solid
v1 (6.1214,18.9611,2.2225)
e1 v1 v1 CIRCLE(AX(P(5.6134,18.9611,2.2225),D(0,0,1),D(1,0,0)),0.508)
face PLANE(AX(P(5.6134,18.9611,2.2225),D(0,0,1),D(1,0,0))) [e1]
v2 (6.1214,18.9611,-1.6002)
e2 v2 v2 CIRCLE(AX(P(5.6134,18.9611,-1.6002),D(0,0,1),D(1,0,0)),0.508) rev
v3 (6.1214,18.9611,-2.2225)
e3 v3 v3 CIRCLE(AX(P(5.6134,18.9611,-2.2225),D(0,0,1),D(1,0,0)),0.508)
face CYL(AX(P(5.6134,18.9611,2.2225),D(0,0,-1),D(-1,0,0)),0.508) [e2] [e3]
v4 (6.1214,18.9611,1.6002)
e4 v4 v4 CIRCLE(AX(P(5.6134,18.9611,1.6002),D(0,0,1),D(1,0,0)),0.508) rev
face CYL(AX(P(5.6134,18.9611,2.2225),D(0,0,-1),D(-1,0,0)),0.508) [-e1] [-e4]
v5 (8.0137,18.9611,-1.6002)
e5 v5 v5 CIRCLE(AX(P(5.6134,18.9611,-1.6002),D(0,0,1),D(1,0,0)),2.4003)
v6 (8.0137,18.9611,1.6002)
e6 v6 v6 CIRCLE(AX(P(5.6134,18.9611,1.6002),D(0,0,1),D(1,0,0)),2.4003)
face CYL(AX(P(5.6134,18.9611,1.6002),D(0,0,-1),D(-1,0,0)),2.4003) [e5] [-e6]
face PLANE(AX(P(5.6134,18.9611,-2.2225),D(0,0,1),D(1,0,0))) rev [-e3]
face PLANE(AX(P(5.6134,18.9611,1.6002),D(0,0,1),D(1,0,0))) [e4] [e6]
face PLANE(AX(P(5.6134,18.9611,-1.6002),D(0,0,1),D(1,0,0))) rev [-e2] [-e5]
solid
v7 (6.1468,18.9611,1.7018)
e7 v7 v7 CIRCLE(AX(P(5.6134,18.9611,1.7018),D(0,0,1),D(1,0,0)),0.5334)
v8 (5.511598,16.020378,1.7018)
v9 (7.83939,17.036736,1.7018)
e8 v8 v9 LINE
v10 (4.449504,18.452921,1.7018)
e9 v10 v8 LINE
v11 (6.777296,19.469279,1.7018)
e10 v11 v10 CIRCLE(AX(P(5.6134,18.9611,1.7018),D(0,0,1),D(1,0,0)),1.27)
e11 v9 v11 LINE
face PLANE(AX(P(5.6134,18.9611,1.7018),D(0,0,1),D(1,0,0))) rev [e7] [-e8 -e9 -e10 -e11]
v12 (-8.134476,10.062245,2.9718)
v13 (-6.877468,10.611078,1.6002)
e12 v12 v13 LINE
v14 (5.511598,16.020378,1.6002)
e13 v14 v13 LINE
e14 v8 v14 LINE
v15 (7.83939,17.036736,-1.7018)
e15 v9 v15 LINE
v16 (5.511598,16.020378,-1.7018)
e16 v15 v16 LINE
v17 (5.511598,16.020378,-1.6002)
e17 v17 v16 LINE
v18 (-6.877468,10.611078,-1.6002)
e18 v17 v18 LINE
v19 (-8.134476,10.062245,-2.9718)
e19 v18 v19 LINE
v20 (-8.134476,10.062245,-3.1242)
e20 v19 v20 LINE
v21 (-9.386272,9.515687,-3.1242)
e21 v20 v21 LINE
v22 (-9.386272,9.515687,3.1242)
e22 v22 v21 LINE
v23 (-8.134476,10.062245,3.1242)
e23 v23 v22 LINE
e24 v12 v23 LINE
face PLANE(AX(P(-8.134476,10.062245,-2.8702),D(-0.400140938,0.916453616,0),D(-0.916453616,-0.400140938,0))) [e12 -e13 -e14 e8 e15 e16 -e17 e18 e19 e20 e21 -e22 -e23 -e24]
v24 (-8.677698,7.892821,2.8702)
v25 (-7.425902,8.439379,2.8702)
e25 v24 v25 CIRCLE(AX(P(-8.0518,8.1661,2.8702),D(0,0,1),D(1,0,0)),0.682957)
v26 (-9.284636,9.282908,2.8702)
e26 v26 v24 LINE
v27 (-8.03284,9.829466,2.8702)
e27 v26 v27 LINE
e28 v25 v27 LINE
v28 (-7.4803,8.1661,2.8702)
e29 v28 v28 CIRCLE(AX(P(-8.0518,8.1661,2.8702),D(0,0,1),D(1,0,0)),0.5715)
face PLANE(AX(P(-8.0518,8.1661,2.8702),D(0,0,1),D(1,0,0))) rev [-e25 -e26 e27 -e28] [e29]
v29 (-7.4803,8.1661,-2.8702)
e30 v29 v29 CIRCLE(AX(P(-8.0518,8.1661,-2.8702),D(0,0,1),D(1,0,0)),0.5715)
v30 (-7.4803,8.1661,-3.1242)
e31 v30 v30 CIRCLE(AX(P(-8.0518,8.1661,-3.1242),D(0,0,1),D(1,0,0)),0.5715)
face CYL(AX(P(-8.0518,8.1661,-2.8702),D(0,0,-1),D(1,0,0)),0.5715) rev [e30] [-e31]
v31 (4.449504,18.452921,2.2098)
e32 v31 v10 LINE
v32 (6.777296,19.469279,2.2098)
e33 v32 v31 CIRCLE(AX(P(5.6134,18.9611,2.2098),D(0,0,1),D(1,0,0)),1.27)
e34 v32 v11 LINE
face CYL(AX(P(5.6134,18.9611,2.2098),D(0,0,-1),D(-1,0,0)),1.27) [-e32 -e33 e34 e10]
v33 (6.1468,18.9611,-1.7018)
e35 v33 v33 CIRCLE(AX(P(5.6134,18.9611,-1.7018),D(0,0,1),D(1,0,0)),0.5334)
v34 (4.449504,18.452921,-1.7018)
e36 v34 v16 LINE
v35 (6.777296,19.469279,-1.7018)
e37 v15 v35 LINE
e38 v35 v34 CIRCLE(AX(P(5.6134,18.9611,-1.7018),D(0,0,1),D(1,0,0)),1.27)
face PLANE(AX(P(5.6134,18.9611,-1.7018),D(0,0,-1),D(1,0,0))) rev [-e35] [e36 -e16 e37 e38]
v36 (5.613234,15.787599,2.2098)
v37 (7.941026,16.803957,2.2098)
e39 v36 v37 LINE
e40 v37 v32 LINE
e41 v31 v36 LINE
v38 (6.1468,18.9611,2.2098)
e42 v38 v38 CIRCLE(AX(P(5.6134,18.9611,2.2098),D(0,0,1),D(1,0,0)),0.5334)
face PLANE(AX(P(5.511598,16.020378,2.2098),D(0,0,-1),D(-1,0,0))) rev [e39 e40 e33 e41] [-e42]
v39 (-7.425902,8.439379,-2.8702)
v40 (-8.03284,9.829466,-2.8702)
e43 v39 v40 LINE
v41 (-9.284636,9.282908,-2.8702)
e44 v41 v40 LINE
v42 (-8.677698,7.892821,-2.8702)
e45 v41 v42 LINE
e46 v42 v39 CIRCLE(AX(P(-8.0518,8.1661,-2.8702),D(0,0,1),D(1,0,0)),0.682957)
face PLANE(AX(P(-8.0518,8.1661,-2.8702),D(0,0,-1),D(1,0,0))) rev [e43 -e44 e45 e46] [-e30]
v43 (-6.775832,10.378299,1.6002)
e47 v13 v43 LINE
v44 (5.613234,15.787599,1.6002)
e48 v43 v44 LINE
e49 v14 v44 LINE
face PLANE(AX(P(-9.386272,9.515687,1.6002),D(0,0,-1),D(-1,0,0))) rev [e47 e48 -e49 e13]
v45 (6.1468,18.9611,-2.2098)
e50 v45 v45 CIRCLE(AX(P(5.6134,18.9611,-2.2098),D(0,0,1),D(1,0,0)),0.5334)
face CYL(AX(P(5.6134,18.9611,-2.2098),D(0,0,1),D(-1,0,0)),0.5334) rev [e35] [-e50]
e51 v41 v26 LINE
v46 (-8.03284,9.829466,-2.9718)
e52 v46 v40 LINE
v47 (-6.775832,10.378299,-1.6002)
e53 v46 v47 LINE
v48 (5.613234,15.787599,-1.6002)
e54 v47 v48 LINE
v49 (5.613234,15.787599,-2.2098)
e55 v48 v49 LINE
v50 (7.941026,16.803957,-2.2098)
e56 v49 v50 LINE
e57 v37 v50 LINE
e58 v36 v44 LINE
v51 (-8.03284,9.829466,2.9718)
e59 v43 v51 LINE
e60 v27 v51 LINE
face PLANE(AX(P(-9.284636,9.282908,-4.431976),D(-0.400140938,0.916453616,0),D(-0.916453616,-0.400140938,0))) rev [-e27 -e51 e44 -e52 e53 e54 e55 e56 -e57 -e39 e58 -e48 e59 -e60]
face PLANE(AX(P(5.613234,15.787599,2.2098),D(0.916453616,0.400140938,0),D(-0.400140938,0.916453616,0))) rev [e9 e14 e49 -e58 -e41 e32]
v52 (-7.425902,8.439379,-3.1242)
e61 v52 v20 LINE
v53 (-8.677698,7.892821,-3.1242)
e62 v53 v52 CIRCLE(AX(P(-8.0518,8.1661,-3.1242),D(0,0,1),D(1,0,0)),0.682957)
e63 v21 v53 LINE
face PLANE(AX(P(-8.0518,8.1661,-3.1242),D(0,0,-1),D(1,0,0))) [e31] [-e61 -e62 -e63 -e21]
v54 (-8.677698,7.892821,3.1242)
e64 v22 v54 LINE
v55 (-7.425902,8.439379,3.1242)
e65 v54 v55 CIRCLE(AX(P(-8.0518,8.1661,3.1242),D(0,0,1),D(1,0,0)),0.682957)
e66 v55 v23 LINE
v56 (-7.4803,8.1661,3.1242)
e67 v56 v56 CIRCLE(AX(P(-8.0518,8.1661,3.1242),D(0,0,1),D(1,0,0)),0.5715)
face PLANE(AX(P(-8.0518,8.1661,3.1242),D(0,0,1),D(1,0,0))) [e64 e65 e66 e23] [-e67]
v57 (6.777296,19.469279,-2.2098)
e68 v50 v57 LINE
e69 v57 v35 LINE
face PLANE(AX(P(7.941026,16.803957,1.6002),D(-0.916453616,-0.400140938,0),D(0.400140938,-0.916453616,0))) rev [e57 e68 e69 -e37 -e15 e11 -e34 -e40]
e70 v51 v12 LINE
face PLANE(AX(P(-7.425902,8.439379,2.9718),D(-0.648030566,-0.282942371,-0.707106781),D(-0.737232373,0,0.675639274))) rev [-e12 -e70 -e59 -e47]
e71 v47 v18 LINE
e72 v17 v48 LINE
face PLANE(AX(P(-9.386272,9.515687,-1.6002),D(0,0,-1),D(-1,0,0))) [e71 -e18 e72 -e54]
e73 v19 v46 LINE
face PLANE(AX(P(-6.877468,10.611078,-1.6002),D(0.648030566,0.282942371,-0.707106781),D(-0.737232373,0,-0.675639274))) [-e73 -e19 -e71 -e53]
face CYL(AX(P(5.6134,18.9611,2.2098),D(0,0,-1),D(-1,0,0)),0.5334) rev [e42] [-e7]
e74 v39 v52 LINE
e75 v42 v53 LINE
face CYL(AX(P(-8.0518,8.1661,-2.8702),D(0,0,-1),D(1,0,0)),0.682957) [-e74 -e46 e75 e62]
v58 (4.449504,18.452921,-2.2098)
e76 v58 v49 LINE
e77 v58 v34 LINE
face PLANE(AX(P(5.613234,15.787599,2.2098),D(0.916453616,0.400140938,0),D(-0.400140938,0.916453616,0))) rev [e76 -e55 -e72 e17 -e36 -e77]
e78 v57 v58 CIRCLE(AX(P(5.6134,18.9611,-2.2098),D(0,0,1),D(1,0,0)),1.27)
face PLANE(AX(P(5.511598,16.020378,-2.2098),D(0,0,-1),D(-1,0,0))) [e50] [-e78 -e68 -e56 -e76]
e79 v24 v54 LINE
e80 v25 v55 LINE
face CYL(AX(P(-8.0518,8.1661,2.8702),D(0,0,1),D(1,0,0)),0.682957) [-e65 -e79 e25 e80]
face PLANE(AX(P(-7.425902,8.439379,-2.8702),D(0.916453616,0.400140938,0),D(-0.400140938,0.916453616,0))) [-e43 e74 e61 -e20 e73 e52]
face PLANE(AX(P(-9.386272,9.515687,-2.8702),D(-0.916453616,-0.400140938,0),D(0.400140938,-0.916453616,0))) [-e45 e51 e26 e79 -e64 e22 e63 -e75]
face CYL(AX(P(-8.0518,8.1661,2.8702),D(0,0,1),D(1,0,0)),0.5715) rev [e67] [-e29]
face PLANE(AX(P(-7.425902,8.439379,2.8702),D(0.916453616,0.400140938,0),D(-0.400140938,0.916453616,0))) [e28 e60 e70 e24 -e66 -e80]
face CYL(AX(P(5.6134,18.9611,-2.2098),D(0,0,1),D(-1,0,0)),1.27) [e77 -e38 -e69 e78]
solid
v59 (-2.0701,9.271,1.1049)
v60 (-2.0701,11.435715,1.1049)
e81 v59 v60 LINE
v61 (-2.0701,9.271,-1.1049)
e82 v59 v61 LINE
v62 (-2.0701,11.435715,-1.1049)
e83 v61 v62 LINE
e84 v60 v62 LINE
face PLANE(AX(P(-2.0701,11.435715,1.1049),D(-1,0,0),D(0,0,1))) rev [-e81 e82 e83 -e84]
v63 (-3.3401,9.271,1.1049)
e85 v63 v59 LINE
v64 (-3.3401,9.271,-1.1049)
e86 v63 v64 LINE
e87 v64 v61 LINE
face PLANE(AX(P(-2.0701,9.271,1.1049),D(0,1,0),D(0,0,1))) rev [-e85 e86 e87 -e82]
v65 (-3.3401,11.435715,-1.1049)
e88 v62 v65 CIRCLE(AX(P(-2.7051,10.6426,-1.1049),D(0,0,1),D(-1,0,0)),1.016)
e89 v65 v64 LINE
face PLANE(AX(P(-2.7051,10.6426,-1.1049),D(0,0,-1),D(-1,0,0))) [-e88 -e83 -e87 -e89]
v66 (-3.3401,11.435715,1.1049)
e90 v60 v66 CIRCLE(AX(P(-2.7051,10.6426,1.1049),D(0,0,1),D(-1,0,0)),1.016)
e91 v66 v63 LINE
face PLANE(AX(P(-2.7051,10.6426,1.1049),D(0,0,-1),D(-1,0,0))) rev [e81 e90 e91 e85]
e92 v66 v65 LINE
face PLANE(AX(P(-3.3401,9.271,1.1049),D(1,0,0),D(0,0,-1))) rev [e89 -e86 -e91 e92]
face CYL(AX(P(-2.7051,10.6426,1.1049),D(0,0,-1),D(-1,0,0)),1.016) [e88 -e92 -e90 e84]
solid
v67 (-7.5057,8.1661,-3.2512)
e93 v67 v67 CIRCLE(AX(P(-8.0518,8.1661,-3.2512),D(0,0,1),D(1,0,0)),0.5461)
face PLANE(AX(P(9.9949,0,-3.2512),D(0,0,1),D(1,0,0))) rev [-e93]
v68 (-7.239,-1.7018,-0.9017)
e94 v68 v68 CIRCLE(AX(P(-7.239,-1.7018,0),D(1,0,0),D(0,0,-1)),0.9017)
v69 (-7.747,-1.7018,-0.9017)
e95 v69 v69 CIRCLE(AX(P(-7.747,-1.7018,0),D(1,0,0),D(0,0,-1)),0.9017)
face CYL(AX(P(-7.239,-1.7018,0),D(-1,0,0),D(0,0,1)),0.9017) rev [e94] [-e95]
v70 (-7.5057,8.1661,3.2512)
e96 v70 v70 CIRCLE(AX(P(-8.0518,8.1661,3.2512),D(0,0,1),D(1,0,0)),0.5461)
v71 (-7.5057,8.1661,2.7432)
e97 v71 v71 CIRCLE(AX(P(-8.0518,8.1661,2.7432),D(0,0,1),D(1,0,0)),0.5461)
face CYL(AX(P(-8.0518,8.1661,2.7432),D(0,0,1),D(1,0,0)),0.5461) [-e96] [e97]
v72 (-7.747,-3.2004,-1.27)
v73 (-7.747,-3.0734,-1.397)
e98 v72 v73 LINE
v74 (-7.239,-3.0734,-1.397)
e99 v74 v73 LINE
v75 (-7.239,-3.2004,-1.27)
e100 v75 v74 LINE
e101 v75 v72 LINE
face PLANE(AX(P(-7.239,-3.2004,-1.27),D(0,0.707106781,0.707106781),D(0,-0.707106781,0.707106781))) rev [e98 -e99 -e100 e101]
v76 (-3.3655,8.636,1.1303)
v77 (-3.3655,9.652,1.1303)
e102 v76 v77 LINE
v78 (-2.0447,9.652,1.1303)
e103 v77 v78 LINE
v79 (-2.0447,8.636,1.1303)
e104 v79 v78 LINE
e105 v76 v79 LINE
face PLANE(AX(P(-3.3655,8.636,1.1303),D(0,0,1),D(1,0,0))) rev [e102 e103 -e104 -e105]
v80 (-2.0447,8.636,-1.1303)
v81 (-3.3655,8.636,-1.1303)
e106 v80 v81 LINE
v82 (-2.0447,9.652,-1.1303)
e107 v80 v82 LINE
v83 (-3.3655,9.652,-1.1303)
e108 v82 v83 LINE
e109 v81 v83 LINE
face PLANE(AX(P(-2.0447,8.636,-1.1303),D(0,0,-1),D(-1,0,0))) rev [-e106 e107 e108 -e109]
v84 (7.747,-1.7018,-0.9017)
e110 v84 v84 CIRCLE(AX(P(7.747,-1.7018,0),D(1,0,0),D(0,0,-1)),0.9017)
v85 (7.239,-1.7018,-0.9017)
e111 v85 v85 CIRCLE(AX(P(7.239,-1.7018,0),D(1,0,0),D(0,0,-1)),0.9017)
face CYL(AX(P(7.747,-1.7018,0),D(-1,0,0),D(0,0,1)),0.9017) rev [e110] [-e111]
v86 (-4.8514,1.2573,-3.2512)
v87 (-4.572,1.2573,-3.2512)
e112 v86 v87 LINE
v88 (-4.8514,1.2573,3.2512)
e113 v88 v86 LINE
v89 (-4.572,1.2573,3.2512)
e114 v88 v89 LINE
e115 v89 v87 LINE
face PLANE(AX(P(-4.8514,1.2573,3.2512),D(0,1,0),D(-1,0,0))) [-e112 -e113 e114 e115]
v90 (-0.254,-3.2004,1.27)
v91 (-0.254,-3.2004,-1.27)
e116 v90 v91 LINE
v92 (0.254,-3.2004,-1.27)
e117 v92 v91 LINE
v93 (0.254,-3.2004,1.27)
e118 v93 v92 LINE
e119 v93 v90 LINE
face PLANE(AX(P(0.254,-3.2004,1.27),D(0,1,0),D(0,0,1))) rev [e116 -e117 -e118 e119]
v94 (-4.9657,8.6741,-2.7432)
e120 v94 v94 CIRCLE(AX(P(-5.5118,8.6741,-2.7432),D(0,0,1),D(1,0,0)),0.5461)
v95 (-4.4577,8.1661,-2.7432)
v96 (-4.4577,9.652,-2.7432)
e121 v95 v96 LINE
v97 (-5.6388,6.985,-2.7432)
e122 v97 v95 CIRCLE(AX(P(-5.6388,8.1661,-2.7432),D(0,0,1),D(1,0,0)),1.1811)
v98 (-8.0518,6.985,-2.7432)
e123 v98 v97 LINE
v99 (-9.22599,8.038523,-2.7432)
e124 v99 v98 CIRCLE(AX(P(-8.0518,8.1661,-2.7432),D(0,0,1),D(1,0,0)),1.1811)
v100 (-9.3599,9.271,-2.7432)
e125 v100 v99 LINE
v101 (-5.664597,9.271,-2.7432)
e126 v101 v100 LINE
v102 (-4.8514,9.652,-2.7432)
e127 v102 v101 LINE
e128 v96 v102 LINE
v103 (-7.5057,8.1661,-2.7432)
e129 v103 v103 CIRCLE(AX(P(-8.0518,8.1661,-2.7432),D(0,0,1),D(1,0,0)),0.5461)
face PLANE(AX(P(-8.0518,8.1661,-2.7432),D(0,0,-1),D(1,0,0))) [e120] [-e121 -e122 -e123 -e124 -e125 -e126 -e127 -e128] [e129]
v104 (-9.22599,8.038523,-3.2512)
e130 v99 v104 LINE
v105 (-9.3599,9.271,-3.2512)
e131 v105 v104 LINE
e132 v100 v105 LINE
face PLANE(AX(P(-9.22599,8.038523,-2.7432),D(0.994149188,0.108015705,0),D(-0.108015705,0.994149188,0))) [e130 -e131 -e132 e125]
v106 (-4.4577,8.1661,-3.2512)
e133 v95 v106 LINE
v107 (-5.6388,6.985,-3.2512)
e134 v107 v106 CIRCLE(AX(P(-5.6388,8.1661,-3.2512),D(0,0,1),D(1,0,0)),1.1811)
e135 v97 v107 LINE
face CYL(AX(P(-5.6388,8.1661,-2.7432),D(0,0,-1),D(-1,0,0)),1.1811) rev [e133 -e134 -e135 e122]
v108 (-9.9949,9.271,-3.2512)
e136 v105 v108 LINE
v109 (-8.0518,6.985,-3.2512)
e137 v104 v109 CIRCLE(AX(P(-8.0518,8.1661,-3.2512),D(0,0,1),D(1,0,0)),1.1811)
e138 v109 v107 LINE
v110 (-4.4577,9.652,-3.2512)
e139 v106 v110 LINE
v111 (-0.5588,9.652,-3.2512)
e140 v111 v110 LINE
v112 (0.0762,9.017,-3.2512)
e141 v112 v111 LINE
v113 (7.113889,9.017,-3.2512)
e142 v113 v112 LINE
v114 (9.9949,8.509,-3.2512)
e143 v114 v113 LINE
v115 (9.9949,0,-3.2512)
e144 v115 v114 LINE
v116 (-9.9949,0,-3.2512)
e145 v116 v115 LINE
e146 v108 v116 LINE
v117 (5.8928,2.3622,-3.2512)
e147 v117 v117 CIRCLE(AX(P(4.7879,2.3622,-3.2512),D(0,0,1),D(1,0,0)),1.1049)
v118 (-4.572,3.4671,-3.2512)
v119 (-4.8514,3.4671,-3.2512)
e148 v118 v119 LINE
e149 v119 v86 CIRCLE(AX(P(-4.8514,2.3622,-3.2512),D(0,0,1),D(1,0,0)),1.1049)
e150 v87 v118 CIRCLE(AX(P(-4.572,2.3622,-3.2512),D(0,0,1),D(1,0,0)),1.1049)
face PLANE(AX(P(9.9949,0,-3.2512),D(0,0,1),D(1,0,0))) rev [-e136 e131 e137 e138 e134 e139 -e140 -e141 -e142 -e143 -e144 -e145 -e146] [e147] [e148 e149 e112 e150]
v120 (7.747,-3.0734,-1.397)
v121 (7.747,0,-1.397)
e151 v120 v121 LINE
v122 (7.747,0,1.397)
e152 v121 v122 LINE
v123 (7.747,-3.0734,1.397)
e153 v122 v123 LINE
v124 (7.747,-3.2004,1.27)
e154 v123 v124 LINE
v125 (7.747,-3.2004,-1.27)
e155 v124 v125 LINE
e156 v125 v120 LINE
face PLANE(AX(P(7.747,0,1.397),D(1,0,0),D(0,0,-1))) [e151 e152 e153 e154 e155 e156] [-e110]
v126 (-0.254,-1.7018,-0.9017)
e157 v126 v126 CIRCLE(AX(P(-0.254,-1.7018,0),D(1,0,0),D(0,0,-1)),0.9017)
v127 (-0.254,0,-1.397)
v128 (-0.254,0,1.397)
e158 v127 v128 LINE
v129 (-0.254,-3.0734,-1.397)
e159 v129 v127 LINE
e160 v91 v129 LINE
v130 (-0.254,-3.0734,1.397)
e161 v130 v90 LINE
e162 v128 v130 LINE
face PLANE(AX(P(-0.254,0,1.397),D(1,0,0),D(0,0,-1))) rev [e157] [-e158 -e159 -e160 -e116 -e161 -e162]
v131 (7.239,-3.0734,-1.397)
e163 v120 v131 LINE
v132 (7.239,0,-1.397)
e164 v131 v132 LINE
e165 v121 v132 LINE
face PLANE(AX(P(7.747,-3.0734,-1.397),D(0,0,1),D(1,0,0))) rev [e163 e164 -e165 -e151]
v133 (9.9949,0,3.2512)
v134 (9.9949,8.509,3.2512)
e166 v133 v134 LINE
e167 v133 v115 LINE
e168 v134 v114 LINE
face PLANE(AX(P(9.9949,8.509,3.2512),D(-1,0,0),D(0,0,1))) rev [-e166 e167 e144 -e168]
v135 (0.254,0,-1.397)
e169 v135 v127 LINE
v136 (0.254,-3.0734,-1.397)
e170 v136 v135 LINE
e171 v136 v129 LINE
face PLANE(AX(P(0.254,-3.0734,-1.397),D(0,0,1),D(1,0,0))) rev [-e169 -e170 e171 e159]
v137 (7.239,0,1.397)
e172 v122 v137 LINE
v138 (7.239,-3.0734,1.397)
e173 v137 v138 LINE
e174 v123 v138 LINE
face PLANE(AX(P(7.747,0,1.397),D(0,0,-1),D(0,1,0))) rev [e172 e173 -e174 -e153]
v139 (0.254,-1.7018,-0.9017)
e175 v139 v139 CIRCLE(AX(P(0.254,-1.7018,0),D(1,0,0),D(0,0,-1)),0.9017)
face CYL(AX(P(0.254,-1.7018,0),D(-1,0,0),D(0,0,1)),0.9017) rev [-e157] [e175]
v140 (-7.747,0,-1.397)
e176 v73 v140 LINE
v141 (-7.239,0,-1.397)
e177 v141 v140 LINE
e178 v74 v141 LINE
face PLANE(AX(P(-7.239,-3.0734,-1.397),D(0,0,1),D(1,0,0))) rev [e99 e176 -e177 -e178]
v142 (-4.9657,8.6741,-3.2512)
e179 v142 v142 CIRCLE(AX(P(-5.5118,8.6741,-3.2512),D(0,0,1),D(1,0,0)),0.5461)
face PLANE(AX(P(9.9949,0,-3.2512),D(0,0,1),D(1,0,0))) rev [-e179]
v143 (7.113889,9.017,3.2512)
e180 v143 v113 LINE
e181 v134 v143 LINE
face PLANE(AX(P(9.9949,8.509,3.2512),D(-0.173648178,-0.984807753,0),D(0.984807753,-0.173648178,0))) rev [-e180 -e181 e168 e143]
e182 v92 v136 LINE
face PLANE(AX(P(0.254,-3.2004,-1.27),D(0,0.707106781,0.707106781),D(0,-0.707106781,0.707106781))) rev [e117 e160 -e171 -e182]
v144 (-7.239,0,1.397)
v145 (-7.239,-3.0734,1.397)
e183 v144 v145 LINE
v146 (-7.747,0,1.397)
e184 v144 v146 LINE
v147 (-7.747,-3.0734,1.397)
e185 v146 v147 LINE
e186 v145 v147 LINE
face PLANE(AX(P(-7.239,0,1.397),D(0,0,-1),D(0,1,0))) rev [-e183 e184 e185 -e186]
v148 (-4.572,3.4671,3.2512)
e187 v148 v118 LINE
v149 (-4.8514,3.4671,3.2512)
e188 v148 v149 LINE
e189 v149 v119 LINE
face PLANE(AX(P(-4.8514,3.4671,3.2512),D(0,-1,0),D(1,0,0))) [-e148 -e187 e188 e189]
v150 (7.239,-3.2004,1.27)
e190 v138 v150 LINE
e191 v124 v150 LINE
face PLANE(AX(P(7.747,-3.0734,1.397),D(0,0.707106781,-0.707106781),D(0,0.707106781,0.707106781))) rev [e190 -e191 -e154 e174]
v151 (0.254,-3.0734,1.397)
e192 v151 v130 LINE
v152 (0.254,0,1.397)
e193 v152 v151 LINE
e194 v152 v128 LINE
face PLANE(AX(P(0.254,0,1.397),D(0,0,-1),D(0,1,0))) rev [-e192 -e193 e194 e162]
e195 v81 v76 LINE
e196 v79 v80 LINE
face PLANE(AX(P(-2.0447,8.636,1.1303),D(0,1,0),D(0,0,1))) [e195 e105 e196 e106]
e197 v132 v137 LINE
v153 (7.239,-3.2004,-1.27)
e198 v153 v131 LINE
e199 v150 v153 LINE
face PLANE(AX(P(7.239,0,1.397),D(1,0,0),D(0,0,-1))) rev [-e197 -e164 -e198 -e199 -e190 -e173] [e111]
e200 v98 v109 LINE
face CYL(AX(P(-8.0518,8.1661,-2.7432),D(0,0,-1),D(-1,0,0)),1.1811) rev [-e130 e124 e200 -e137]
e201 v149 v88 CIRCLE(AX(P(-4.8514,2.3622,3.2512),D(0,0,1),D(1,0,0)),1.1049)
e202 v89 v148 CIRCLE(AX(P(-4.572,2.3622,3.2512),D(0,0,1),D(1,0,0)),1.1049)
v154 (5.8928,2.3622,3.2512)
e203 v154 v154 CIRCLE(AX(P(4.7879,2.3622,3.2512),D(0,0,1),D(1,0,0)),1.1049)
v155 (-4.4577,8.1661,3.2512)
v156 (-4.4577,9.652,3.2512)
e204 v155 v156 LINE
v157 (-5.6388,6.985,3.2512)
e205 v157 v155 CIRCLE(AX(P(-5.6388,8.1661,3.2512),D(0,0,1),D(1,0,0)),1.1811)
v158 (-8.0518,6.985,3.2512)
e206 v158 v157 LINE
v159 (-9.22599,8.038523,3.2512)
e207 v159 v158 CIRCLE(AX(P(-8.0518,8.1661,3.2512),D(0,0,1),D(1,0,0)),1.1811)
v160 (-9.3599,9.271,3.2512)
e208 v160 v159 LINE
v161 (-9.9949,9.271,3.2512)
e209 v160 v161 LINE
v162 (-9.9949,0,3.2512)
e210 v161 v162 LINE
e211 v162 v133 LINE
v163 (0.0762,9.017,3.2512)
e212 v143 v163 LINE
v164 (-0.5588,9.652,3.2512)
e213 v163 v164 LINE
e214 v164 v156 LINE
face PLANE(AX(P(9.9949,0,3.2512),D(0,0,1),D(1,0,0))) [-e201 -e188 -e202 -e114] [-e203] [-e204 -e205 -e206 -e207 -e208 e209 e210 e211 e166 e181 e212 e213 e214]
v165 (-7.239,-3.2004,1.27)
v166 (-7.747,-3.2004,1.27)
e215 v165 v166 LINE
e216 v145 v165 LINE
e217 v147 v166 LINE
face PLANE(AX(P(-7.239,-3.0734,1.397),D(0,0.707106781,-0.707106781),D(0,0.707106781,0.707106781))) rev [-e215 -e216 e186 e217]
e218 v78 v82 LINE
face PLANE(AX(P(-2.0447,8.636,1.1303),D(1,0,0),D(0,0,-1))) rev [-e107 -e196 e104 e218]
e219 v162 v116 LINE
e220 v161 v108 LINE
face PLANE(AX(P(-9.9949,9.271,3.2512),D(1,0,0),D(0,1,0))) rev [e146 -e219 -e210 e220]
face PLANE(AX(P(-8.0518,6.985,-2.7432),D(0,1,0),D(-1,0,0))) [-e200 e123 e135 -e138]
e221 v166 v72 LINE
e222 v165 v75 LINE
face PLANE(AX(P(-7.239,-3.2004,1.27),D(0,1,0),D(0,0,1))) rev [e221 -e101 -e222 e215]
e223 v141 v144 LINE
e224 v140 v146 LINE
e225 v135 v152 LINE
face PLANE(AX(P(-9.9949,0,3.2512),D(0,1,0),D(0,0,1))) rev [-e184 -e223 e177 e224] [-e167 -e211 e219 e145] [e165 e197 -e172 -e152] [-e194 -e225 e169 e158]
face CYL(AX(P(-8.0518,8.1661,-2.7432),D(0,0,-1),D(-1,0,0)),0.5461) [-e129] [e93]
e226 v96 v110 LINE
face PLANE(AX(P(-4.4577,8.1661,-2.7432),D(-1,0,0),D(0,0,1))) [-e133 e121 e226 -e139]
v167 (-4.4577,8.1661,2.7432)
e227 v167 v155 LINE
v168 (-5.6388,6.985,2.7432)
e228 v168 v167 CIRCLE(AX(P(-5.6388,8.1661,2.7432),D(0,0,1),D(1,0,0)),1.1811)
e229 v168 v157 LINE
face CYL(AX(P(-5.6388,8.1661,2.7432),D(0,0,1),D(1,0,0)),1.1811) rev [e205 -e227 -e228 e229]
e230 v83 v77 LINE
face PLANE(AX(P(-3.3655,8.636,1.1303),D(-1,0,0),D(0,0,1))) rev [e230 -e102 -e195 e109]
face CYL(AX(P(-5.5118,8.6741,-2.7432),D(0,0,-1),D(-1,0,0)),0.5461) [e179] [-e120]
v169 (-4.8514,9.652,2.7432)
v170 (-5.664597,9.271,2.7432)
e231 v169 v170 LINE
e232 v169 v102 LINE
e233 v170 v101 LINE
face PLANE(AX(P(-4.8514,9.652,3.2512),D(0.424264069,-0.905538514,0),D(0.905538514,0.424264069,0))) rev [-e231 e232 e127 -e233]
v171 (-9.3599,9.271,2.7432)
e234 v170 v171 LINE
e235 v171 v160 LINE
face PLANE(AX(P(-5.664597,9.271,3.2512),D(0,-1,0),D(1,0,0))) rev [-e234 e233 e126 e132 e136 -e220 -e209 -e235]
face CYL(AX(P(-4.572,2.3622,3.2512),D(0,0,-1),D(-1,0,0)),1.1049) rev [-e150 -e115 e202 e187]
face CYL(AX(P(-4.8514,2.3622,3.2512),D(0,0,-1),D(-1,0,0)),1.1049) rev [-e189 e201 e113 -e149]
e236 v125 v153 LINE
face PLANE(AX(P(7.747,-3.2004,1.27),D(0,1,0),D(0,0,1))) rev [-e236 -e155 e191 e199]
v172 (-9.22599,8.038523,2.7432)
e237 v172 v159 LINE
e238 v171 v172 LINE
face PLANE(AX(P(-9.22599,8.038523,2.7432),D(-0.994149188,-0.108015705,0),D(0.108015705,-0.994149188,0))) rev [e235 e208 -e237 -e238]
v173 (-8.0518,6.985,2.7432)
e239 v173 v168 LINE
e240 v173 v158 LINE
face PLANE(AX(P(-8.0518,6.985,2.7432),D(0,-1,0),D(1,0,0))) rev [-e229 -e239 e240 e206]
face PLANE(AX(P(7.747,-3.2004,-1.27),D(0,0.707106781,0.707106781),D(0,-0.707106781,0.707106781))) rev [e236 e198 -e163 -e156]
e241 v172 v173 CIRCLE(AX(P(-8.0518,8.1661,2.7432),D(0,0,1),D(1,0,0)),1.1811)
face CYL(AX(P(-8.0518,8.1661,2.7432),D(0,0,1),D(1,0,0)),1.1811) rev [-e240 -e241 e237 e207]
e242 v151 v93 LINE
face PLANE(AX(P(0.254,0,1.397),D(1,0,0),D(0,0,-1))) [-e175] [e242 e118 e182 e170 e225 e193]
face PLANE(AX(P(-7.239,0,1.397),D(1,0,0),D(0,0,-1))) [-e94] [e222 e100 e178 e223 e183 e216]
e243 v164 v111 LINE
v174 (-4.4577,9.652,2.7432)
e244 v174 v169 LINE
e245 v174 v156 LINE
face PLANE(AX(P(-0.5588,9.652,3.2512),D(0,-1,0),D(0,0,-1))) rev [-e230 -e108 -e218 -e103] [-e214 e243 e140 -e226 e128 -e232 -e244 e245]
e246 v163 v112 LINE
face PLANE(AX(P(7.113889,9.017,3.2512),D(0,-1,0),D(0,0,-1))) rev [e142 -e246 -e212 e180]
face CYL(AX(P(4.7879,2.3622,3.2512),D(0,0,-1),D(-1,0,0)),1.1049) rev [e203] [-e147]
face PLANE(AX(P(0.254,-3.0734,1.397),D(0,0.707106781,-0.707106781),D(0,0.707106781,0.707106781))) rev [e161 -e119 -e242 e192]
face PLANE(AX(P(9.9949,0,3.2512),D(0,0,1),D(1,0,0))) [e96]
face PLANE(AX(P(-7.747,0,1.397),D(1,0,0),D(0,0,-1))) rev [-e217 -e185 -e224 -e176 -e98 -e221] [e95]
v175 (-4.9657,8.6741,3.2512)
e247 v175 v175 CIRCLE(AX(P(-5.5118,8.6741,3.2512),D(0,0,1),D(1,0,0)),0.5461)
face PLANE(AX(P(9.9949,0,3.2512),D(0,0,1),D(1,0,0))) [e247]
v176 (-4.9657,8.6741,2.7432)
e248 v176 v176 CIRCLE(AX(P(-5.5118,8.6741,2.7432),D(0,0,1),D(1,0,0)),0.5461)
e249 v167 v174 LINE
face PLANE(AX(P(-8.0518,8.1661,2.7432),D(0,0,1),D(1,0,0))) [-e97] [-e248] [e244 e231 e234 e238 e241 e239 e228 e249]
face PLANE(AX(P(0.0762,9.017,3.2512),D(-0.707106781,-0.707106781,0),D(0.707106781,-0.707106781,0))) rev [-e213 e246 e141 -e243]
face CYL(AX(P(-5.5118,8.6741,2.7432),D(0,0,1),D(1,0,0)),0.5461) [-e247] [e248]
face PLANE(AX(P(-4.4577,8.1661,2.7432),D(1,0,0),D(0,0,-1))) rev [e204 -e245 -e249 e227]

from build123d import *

# Parameters (mm, degrees)
SKETCH2_R            = 1.1049
EXTRUDE1_DEPTH       = 3.2512
EXTRUDE2_DEPTH       = 1.1049
SKETCH4_W            = 1.3208
SKETCH4_H            = 2.2606
CUT_EXTRUDE1_DEPTH   = 1.016
SKETCH5_R            = 0.5461
CUT_EXTRUDE2_DEPTH   = 0.508
SKETCH10_R           = 0.9017
EXTRUDE6_DEPTH       = 0.254
LPATTERN1_COUNT      = 3
LPATTERN1_PITCH      = 7.493
EXTRUDE3_DEPTH       = 1.6002
EXTRUDE4_START       = -0.127
SKETCH8_R            = 0.5715
EXTRUDE4_DEPTH       = 0.254
EXTRUDE5_DEPTH       = 1.27
SKETCH11_R           = 2.4003
EXTRUDE7_DEPTH       = 1.6002
SKETCH12_R           = 0.508
EXTRUDE8_DEPTH       = 2.2225
EXTRUDE9_START       = 0.1016
SKETCH13_R           = 0.5334
EXTRUDE9_DEPTH       = 0.508
EXTRUDE10_DEPTH      = 2.2098
EXTRUDE10_DEPTH_BACK = 2.2098


with BuildPart() as part:
    # Sketch2 → Extrude1 (new, symmetric)
    with BuildSketch(Plane.XY):
        Polygon((9.9949, 8.509), (7.113888836, 9.017), (0.0762, 9.017), (-0.5588, 9.652), (-4.8514, 9.652), (-5.664596778, 9.271), (-9.9949, 9.271), (-9.9949, 0), (9.9949, 0), align=None)
        with Locations((4.7879, 2.3622)):
            Circle(SKETCH2_R, mode=Mode.SUBTRACT)
        with BuildLine():
            Line((-4.8514, 3.4671), (-4.572, 3.4671))
            ThreePointArc((-4.572, 3.4671), (-3.4671, 2.3622), (-4.572, 1.2573))
            Line((-4.572, 1.2573), (-4.8514, 1.2573))
            ThreePointArc((-4.8514, 1.2573), (-5.9563, 2.3622), (-4.8514, 3.4671))
        make_face(mode=Mode.SUBTRACT)
    extrude(amount=EXTRUDE1_DEPTH, both=True)

    # Sketch4 → Cut-Extrude1 (cut)
    with BuildSketch(Plane(origin=(0, 9.652, 0), x_dir=(-1, 0, 0), z_dir=(0, 1, 0))):
        with Locations((2.7051, 0)):
            Rectangle(SKETCH4_W, SKETCH4_H)
    extrude(amount=-CUT_EXTRUDE1_DEPTH, mode=Mode.SUBTRACT)

    # Sketch5 → Cut-Extrude2 (cut)
    with BuildSketch(Plane.XY.offset(3.2512)):
        with BuildLine():
            Line((-8.0518, 6.985), (-5.6388, 6.985))
            ThreePointArc((-5.6388, 6.985), (-4.803636181, 7.330936181), (-4.4577, 8.1661))
            Line((-4.4577, 8.1661), (-4.4577, 9.652))
            Line((-4.4577, 9.652), (-4.8514, 9.652))
            Line((-4.8514, 9.652), (-5.664596778, 9.271))
            Line((-5.664596778, 9.271), (-9.2329, 9.271))
            Line((-9.2329, 9.271), (-9.3599, 9.271))
            Line((-9.3599, 9.271), (-9.225989606, 8.038522651))
            ThreePointArc((-9.225989606, 8.038522651), (-8.840569803, 7.286987147), (-8.0518, 6.985))
        make_face()
        with Locations((-5.5118, 8.6741)):
            Circle(SKETCH5_R, mode=Mode.SUBTRACT)
        with Locations((-8.0518, 8.1661)):
            Circle(SKETCH5_R, mode=Mode.SUBTRACT)
    cut_extrude2 = extrude(amount=-CUT_EXTRUDE2_DEPTH, mode=Mode.SUBTRACT)

    # Mirror1: Cut-Extrude2 across plane
    add(cut_extrude2.mirror(Plane.XY), mode=Mode.SUBTRACT)

    # Sketch10 → Extrude6 (add, symmetric)
    with BuildSketch(Plane(origin=(-7.493, 0, 0), x_dir=(0, 0, -1), z_dir=(1, 0, 0))):
        Polygon((-1.397, 0), (-1.397, -3.0734), (-1.27, -3.2004), (1.27, -3.2004), (1.397, -3.0734), (1.397, 0), align=None)
        with Locations((0, -1.7018)):
            Circle(SKETCH10_R, mode=Mode.SUBTRACT)
    extrude6 = extrude(amount=EXTRUDE6_DEPTH, both=True)

    # LPattern1: Extrude6 ×3
    with Locations(*[(i * LPATTERN1_PITCH, 0, 0) for i in range(1, LPATTERN1_COUNT)]):
        add(extrude6)


with BuildPart() as body_2:
    # Sketch3 → Extrude2 (new, symmetric)
    with BuildSketch(Plane.XY):
        with BuildLine():
            Line((-3.3401, 9.271), (-3.3401, 11.435714746))
            ThreePointArc((-3.3401, 11.435714746), (-2.7051, 11.6586), (-2.0701, 11.435714746))
            Line((-2.0701, 11.435714746), (-2.0701, 9.271))
            Line((-2.0701, 9.271), (-3.3401, 9.271))
        make_face()
    extrude(amount=EXTRUDE2_DEPTH, both=True)


with BuildPart() as body_3:
    # Sketch6 → Extrude3 (new, symmetric)
    with BuildSketch(Plane.XY):
        Polygon((-9.28463618, 9.282907872), (7.941025982, 16.80395694), (7.839390183, 17.036736159), (-9.386271978, 9.51568709), align=None)
    extrude(amount=EXTRUDE3_DEPTH, both=True)


with BuildPart() as body_4:
    # Sketch8 → Extrude4 (new body)
    with BuildSketch(Plane.XY.offset(3.2512).offset(EXTRUDE4_START)):
        with BuildLine():
            Line((-7.425901931, 8.439378905), (-8.134475841, 10.0622449))
            Line((-8.134475841, 10.0622449), (-9.386271978, 9.51568709))
            Line((-9.386271978, 9.51568709), (-8.677698069, 7.892821095))
            ThreePointArc((-8.677698069, 7.892821095), (-7.778521095, 7.540201931), (-7.425901931, 8.439378905))
        make_face()
        with Locations((-8.0518, 8.1661)):
            Circle(SKETCH8_R, mode=Mode.SUBTRACT)
    extrude(amount=-EXTRUDE4_DEPTH)

    # Sketch9 → Extrude5 (add)
    with BuildSketch(Plane.XY.offset(1.6002)):
        Polygon((-8.032840042, 9.829465681), (-8.134475841, 10.0622449), (-9.386271978, 9.51568709), (-9.28463618, 9.282907872), align=None)
    extrude(amount=EXTRUDE5_DEPTH)


with BuildPart() as body_5:
    # Mirror7: mirrored copy
    add(body_4.part.mirror(Plane.XY))

    # Combine1: union body 3, body 4
    add(body_3.part)
    add(body_4.part)



with BuildPart() as body_4_2:
    # Sketch11 → Extrude7 (new, symmetric)
    with BuildSketch(Plane.XY):
        with Locations((5.6134, 18.9611)):
            Circle(SKETCH11_R)
    extrude(amount=EXTRUDE7_DEPTH, both=True)

    # Sketch12 → Extrude8 (add, symmetric)
    with BuildSketch(Plane.XY):
        with Locations((5.6134, 18.9611)):
            Circle(SKETCH12_R)
    extrude(amount=EXTRUDE8_DEPTH, both=True)


with BuildPart() as body_5_2:
    # Sketch13 → Extrude9 (new body)
    with BuildSketch(Plane.XY.offset(1.6002).offset(EXTRUDE9_START)):
        with BuildLine():
            Line((5.613233798, 15.787598958), (7.941025982, 16.80395694))
            Line((7.941025982, 16.80395694), (6.777296092, 19.469278991))
            ThreePointArc((6.777296092, 19.469278991), (5.105221009, 20.124996092), (4.449503908, 18.452921009))
            Line((4.449503908, 18.452921009), (5.613233798, 15.787598958))
        make_face()
        with Locations((5.6134, 18.9611)):
            Circle(SKETCH13_R, mode=Mode.SUBTRACT)
    extrude(amount=EXTRUDE9_DEPTH)


with BuildPart() as body_6:
    # Mirror8: mirrored copy
    add(body_5_2.part.mirror(Plane.XY))


with BuildPart() as body_5_1:
    add(body_5.part)

    add(body_5_2.part)  # Extrude10 merges body 5 2

    add(body_6.part)  # Extrude10 merges body 6
    # Sketch14 → Extrude10 (add, two sides: drawn at the far end of the back side and taken through both)
    with BuildSketch(Plane.XY.offset(-EXTRUDE10_DEPTH_BACK)):
        Polygon((5.613233798, 15.787598958), (5.511597999, 16.020378177), (7.839390183, 17.036736159), (7.941025982, 16.80395694), align=None)
    extrude(amount=EXTRUDE10_DEPTH + EXTRUDE10_DEPTH_BACK)

    # Chamfer1
    # the kernel refuses this chamfer: 1.3716 mm, written as the material it adds along each edge
    with BuildSketch(Plane(origin=(-8.032840042, 9.829465681, -1.6002), x_dir=(-0.025198695538167178, -0.011002225854772951, -0.9996219169112968), z_dir=(-0.4001409378792548, 0.9164536157564716, 0))) as chamfer1_piece_1:
        with BuildLine():
            Line((1.410928155, 0), (-0.077560078, -1.408794766))
            Line((-0.077560078, -1.408794766), (-0.104981706, -1.408040499))
            ThreePointArc((-0.104981706, -1.408040499), (-0.046811648, -0.704176463), (-0.027421628, 0.000754267))
            Line((-0.027421628, 0.000754267), (0.000754267, 0.027421628))
            ThreePointArc((0.000754267, 0.027421628), (0.705684997, 0.008031609), (1.411682421, 0.027421628))
            Line((1.411682421, 0.027421628), (1.410928155, 0))
        make_face()
    extrude(amount=0.254)
    with BuildSketch(Plane(origin=(-8.032840042, 9.829465681, 1.6002), x_dir=(-0.025198695538167178, -0.011002225854772951, 0.9996219169112968), z_dir=(-0.4001409378792548, 0.9164536157564716, 0))) as chamfer1_piece_2:
        with BuildLine():
            Line((1.410928155, 0), (-0.077560078, 1.408794766))
            Line((-0.077560078, 1.408794766), (-0.104981706, 1.408040499))
            ThreePointArc((-0.104981706, 1.408040499), (-0.046811648, 0.704176463), (-0.027421628, -0.000754267))
            Line((-0.027421628, -0.000754267), (0.000754267, -0.027421628))
            ThreePointArc((0.000754267, -0.027421628), (0.705684997, -0.008031609), (1.411682421, -0.027421628))
            Line((1.411682421, -0.027421628), (1.410928155, 0))
        make_face()
    extrude(amount=0.254)


solid = Compound([part.part, body_2.part, body_4_2.part, body_5_1.part])
